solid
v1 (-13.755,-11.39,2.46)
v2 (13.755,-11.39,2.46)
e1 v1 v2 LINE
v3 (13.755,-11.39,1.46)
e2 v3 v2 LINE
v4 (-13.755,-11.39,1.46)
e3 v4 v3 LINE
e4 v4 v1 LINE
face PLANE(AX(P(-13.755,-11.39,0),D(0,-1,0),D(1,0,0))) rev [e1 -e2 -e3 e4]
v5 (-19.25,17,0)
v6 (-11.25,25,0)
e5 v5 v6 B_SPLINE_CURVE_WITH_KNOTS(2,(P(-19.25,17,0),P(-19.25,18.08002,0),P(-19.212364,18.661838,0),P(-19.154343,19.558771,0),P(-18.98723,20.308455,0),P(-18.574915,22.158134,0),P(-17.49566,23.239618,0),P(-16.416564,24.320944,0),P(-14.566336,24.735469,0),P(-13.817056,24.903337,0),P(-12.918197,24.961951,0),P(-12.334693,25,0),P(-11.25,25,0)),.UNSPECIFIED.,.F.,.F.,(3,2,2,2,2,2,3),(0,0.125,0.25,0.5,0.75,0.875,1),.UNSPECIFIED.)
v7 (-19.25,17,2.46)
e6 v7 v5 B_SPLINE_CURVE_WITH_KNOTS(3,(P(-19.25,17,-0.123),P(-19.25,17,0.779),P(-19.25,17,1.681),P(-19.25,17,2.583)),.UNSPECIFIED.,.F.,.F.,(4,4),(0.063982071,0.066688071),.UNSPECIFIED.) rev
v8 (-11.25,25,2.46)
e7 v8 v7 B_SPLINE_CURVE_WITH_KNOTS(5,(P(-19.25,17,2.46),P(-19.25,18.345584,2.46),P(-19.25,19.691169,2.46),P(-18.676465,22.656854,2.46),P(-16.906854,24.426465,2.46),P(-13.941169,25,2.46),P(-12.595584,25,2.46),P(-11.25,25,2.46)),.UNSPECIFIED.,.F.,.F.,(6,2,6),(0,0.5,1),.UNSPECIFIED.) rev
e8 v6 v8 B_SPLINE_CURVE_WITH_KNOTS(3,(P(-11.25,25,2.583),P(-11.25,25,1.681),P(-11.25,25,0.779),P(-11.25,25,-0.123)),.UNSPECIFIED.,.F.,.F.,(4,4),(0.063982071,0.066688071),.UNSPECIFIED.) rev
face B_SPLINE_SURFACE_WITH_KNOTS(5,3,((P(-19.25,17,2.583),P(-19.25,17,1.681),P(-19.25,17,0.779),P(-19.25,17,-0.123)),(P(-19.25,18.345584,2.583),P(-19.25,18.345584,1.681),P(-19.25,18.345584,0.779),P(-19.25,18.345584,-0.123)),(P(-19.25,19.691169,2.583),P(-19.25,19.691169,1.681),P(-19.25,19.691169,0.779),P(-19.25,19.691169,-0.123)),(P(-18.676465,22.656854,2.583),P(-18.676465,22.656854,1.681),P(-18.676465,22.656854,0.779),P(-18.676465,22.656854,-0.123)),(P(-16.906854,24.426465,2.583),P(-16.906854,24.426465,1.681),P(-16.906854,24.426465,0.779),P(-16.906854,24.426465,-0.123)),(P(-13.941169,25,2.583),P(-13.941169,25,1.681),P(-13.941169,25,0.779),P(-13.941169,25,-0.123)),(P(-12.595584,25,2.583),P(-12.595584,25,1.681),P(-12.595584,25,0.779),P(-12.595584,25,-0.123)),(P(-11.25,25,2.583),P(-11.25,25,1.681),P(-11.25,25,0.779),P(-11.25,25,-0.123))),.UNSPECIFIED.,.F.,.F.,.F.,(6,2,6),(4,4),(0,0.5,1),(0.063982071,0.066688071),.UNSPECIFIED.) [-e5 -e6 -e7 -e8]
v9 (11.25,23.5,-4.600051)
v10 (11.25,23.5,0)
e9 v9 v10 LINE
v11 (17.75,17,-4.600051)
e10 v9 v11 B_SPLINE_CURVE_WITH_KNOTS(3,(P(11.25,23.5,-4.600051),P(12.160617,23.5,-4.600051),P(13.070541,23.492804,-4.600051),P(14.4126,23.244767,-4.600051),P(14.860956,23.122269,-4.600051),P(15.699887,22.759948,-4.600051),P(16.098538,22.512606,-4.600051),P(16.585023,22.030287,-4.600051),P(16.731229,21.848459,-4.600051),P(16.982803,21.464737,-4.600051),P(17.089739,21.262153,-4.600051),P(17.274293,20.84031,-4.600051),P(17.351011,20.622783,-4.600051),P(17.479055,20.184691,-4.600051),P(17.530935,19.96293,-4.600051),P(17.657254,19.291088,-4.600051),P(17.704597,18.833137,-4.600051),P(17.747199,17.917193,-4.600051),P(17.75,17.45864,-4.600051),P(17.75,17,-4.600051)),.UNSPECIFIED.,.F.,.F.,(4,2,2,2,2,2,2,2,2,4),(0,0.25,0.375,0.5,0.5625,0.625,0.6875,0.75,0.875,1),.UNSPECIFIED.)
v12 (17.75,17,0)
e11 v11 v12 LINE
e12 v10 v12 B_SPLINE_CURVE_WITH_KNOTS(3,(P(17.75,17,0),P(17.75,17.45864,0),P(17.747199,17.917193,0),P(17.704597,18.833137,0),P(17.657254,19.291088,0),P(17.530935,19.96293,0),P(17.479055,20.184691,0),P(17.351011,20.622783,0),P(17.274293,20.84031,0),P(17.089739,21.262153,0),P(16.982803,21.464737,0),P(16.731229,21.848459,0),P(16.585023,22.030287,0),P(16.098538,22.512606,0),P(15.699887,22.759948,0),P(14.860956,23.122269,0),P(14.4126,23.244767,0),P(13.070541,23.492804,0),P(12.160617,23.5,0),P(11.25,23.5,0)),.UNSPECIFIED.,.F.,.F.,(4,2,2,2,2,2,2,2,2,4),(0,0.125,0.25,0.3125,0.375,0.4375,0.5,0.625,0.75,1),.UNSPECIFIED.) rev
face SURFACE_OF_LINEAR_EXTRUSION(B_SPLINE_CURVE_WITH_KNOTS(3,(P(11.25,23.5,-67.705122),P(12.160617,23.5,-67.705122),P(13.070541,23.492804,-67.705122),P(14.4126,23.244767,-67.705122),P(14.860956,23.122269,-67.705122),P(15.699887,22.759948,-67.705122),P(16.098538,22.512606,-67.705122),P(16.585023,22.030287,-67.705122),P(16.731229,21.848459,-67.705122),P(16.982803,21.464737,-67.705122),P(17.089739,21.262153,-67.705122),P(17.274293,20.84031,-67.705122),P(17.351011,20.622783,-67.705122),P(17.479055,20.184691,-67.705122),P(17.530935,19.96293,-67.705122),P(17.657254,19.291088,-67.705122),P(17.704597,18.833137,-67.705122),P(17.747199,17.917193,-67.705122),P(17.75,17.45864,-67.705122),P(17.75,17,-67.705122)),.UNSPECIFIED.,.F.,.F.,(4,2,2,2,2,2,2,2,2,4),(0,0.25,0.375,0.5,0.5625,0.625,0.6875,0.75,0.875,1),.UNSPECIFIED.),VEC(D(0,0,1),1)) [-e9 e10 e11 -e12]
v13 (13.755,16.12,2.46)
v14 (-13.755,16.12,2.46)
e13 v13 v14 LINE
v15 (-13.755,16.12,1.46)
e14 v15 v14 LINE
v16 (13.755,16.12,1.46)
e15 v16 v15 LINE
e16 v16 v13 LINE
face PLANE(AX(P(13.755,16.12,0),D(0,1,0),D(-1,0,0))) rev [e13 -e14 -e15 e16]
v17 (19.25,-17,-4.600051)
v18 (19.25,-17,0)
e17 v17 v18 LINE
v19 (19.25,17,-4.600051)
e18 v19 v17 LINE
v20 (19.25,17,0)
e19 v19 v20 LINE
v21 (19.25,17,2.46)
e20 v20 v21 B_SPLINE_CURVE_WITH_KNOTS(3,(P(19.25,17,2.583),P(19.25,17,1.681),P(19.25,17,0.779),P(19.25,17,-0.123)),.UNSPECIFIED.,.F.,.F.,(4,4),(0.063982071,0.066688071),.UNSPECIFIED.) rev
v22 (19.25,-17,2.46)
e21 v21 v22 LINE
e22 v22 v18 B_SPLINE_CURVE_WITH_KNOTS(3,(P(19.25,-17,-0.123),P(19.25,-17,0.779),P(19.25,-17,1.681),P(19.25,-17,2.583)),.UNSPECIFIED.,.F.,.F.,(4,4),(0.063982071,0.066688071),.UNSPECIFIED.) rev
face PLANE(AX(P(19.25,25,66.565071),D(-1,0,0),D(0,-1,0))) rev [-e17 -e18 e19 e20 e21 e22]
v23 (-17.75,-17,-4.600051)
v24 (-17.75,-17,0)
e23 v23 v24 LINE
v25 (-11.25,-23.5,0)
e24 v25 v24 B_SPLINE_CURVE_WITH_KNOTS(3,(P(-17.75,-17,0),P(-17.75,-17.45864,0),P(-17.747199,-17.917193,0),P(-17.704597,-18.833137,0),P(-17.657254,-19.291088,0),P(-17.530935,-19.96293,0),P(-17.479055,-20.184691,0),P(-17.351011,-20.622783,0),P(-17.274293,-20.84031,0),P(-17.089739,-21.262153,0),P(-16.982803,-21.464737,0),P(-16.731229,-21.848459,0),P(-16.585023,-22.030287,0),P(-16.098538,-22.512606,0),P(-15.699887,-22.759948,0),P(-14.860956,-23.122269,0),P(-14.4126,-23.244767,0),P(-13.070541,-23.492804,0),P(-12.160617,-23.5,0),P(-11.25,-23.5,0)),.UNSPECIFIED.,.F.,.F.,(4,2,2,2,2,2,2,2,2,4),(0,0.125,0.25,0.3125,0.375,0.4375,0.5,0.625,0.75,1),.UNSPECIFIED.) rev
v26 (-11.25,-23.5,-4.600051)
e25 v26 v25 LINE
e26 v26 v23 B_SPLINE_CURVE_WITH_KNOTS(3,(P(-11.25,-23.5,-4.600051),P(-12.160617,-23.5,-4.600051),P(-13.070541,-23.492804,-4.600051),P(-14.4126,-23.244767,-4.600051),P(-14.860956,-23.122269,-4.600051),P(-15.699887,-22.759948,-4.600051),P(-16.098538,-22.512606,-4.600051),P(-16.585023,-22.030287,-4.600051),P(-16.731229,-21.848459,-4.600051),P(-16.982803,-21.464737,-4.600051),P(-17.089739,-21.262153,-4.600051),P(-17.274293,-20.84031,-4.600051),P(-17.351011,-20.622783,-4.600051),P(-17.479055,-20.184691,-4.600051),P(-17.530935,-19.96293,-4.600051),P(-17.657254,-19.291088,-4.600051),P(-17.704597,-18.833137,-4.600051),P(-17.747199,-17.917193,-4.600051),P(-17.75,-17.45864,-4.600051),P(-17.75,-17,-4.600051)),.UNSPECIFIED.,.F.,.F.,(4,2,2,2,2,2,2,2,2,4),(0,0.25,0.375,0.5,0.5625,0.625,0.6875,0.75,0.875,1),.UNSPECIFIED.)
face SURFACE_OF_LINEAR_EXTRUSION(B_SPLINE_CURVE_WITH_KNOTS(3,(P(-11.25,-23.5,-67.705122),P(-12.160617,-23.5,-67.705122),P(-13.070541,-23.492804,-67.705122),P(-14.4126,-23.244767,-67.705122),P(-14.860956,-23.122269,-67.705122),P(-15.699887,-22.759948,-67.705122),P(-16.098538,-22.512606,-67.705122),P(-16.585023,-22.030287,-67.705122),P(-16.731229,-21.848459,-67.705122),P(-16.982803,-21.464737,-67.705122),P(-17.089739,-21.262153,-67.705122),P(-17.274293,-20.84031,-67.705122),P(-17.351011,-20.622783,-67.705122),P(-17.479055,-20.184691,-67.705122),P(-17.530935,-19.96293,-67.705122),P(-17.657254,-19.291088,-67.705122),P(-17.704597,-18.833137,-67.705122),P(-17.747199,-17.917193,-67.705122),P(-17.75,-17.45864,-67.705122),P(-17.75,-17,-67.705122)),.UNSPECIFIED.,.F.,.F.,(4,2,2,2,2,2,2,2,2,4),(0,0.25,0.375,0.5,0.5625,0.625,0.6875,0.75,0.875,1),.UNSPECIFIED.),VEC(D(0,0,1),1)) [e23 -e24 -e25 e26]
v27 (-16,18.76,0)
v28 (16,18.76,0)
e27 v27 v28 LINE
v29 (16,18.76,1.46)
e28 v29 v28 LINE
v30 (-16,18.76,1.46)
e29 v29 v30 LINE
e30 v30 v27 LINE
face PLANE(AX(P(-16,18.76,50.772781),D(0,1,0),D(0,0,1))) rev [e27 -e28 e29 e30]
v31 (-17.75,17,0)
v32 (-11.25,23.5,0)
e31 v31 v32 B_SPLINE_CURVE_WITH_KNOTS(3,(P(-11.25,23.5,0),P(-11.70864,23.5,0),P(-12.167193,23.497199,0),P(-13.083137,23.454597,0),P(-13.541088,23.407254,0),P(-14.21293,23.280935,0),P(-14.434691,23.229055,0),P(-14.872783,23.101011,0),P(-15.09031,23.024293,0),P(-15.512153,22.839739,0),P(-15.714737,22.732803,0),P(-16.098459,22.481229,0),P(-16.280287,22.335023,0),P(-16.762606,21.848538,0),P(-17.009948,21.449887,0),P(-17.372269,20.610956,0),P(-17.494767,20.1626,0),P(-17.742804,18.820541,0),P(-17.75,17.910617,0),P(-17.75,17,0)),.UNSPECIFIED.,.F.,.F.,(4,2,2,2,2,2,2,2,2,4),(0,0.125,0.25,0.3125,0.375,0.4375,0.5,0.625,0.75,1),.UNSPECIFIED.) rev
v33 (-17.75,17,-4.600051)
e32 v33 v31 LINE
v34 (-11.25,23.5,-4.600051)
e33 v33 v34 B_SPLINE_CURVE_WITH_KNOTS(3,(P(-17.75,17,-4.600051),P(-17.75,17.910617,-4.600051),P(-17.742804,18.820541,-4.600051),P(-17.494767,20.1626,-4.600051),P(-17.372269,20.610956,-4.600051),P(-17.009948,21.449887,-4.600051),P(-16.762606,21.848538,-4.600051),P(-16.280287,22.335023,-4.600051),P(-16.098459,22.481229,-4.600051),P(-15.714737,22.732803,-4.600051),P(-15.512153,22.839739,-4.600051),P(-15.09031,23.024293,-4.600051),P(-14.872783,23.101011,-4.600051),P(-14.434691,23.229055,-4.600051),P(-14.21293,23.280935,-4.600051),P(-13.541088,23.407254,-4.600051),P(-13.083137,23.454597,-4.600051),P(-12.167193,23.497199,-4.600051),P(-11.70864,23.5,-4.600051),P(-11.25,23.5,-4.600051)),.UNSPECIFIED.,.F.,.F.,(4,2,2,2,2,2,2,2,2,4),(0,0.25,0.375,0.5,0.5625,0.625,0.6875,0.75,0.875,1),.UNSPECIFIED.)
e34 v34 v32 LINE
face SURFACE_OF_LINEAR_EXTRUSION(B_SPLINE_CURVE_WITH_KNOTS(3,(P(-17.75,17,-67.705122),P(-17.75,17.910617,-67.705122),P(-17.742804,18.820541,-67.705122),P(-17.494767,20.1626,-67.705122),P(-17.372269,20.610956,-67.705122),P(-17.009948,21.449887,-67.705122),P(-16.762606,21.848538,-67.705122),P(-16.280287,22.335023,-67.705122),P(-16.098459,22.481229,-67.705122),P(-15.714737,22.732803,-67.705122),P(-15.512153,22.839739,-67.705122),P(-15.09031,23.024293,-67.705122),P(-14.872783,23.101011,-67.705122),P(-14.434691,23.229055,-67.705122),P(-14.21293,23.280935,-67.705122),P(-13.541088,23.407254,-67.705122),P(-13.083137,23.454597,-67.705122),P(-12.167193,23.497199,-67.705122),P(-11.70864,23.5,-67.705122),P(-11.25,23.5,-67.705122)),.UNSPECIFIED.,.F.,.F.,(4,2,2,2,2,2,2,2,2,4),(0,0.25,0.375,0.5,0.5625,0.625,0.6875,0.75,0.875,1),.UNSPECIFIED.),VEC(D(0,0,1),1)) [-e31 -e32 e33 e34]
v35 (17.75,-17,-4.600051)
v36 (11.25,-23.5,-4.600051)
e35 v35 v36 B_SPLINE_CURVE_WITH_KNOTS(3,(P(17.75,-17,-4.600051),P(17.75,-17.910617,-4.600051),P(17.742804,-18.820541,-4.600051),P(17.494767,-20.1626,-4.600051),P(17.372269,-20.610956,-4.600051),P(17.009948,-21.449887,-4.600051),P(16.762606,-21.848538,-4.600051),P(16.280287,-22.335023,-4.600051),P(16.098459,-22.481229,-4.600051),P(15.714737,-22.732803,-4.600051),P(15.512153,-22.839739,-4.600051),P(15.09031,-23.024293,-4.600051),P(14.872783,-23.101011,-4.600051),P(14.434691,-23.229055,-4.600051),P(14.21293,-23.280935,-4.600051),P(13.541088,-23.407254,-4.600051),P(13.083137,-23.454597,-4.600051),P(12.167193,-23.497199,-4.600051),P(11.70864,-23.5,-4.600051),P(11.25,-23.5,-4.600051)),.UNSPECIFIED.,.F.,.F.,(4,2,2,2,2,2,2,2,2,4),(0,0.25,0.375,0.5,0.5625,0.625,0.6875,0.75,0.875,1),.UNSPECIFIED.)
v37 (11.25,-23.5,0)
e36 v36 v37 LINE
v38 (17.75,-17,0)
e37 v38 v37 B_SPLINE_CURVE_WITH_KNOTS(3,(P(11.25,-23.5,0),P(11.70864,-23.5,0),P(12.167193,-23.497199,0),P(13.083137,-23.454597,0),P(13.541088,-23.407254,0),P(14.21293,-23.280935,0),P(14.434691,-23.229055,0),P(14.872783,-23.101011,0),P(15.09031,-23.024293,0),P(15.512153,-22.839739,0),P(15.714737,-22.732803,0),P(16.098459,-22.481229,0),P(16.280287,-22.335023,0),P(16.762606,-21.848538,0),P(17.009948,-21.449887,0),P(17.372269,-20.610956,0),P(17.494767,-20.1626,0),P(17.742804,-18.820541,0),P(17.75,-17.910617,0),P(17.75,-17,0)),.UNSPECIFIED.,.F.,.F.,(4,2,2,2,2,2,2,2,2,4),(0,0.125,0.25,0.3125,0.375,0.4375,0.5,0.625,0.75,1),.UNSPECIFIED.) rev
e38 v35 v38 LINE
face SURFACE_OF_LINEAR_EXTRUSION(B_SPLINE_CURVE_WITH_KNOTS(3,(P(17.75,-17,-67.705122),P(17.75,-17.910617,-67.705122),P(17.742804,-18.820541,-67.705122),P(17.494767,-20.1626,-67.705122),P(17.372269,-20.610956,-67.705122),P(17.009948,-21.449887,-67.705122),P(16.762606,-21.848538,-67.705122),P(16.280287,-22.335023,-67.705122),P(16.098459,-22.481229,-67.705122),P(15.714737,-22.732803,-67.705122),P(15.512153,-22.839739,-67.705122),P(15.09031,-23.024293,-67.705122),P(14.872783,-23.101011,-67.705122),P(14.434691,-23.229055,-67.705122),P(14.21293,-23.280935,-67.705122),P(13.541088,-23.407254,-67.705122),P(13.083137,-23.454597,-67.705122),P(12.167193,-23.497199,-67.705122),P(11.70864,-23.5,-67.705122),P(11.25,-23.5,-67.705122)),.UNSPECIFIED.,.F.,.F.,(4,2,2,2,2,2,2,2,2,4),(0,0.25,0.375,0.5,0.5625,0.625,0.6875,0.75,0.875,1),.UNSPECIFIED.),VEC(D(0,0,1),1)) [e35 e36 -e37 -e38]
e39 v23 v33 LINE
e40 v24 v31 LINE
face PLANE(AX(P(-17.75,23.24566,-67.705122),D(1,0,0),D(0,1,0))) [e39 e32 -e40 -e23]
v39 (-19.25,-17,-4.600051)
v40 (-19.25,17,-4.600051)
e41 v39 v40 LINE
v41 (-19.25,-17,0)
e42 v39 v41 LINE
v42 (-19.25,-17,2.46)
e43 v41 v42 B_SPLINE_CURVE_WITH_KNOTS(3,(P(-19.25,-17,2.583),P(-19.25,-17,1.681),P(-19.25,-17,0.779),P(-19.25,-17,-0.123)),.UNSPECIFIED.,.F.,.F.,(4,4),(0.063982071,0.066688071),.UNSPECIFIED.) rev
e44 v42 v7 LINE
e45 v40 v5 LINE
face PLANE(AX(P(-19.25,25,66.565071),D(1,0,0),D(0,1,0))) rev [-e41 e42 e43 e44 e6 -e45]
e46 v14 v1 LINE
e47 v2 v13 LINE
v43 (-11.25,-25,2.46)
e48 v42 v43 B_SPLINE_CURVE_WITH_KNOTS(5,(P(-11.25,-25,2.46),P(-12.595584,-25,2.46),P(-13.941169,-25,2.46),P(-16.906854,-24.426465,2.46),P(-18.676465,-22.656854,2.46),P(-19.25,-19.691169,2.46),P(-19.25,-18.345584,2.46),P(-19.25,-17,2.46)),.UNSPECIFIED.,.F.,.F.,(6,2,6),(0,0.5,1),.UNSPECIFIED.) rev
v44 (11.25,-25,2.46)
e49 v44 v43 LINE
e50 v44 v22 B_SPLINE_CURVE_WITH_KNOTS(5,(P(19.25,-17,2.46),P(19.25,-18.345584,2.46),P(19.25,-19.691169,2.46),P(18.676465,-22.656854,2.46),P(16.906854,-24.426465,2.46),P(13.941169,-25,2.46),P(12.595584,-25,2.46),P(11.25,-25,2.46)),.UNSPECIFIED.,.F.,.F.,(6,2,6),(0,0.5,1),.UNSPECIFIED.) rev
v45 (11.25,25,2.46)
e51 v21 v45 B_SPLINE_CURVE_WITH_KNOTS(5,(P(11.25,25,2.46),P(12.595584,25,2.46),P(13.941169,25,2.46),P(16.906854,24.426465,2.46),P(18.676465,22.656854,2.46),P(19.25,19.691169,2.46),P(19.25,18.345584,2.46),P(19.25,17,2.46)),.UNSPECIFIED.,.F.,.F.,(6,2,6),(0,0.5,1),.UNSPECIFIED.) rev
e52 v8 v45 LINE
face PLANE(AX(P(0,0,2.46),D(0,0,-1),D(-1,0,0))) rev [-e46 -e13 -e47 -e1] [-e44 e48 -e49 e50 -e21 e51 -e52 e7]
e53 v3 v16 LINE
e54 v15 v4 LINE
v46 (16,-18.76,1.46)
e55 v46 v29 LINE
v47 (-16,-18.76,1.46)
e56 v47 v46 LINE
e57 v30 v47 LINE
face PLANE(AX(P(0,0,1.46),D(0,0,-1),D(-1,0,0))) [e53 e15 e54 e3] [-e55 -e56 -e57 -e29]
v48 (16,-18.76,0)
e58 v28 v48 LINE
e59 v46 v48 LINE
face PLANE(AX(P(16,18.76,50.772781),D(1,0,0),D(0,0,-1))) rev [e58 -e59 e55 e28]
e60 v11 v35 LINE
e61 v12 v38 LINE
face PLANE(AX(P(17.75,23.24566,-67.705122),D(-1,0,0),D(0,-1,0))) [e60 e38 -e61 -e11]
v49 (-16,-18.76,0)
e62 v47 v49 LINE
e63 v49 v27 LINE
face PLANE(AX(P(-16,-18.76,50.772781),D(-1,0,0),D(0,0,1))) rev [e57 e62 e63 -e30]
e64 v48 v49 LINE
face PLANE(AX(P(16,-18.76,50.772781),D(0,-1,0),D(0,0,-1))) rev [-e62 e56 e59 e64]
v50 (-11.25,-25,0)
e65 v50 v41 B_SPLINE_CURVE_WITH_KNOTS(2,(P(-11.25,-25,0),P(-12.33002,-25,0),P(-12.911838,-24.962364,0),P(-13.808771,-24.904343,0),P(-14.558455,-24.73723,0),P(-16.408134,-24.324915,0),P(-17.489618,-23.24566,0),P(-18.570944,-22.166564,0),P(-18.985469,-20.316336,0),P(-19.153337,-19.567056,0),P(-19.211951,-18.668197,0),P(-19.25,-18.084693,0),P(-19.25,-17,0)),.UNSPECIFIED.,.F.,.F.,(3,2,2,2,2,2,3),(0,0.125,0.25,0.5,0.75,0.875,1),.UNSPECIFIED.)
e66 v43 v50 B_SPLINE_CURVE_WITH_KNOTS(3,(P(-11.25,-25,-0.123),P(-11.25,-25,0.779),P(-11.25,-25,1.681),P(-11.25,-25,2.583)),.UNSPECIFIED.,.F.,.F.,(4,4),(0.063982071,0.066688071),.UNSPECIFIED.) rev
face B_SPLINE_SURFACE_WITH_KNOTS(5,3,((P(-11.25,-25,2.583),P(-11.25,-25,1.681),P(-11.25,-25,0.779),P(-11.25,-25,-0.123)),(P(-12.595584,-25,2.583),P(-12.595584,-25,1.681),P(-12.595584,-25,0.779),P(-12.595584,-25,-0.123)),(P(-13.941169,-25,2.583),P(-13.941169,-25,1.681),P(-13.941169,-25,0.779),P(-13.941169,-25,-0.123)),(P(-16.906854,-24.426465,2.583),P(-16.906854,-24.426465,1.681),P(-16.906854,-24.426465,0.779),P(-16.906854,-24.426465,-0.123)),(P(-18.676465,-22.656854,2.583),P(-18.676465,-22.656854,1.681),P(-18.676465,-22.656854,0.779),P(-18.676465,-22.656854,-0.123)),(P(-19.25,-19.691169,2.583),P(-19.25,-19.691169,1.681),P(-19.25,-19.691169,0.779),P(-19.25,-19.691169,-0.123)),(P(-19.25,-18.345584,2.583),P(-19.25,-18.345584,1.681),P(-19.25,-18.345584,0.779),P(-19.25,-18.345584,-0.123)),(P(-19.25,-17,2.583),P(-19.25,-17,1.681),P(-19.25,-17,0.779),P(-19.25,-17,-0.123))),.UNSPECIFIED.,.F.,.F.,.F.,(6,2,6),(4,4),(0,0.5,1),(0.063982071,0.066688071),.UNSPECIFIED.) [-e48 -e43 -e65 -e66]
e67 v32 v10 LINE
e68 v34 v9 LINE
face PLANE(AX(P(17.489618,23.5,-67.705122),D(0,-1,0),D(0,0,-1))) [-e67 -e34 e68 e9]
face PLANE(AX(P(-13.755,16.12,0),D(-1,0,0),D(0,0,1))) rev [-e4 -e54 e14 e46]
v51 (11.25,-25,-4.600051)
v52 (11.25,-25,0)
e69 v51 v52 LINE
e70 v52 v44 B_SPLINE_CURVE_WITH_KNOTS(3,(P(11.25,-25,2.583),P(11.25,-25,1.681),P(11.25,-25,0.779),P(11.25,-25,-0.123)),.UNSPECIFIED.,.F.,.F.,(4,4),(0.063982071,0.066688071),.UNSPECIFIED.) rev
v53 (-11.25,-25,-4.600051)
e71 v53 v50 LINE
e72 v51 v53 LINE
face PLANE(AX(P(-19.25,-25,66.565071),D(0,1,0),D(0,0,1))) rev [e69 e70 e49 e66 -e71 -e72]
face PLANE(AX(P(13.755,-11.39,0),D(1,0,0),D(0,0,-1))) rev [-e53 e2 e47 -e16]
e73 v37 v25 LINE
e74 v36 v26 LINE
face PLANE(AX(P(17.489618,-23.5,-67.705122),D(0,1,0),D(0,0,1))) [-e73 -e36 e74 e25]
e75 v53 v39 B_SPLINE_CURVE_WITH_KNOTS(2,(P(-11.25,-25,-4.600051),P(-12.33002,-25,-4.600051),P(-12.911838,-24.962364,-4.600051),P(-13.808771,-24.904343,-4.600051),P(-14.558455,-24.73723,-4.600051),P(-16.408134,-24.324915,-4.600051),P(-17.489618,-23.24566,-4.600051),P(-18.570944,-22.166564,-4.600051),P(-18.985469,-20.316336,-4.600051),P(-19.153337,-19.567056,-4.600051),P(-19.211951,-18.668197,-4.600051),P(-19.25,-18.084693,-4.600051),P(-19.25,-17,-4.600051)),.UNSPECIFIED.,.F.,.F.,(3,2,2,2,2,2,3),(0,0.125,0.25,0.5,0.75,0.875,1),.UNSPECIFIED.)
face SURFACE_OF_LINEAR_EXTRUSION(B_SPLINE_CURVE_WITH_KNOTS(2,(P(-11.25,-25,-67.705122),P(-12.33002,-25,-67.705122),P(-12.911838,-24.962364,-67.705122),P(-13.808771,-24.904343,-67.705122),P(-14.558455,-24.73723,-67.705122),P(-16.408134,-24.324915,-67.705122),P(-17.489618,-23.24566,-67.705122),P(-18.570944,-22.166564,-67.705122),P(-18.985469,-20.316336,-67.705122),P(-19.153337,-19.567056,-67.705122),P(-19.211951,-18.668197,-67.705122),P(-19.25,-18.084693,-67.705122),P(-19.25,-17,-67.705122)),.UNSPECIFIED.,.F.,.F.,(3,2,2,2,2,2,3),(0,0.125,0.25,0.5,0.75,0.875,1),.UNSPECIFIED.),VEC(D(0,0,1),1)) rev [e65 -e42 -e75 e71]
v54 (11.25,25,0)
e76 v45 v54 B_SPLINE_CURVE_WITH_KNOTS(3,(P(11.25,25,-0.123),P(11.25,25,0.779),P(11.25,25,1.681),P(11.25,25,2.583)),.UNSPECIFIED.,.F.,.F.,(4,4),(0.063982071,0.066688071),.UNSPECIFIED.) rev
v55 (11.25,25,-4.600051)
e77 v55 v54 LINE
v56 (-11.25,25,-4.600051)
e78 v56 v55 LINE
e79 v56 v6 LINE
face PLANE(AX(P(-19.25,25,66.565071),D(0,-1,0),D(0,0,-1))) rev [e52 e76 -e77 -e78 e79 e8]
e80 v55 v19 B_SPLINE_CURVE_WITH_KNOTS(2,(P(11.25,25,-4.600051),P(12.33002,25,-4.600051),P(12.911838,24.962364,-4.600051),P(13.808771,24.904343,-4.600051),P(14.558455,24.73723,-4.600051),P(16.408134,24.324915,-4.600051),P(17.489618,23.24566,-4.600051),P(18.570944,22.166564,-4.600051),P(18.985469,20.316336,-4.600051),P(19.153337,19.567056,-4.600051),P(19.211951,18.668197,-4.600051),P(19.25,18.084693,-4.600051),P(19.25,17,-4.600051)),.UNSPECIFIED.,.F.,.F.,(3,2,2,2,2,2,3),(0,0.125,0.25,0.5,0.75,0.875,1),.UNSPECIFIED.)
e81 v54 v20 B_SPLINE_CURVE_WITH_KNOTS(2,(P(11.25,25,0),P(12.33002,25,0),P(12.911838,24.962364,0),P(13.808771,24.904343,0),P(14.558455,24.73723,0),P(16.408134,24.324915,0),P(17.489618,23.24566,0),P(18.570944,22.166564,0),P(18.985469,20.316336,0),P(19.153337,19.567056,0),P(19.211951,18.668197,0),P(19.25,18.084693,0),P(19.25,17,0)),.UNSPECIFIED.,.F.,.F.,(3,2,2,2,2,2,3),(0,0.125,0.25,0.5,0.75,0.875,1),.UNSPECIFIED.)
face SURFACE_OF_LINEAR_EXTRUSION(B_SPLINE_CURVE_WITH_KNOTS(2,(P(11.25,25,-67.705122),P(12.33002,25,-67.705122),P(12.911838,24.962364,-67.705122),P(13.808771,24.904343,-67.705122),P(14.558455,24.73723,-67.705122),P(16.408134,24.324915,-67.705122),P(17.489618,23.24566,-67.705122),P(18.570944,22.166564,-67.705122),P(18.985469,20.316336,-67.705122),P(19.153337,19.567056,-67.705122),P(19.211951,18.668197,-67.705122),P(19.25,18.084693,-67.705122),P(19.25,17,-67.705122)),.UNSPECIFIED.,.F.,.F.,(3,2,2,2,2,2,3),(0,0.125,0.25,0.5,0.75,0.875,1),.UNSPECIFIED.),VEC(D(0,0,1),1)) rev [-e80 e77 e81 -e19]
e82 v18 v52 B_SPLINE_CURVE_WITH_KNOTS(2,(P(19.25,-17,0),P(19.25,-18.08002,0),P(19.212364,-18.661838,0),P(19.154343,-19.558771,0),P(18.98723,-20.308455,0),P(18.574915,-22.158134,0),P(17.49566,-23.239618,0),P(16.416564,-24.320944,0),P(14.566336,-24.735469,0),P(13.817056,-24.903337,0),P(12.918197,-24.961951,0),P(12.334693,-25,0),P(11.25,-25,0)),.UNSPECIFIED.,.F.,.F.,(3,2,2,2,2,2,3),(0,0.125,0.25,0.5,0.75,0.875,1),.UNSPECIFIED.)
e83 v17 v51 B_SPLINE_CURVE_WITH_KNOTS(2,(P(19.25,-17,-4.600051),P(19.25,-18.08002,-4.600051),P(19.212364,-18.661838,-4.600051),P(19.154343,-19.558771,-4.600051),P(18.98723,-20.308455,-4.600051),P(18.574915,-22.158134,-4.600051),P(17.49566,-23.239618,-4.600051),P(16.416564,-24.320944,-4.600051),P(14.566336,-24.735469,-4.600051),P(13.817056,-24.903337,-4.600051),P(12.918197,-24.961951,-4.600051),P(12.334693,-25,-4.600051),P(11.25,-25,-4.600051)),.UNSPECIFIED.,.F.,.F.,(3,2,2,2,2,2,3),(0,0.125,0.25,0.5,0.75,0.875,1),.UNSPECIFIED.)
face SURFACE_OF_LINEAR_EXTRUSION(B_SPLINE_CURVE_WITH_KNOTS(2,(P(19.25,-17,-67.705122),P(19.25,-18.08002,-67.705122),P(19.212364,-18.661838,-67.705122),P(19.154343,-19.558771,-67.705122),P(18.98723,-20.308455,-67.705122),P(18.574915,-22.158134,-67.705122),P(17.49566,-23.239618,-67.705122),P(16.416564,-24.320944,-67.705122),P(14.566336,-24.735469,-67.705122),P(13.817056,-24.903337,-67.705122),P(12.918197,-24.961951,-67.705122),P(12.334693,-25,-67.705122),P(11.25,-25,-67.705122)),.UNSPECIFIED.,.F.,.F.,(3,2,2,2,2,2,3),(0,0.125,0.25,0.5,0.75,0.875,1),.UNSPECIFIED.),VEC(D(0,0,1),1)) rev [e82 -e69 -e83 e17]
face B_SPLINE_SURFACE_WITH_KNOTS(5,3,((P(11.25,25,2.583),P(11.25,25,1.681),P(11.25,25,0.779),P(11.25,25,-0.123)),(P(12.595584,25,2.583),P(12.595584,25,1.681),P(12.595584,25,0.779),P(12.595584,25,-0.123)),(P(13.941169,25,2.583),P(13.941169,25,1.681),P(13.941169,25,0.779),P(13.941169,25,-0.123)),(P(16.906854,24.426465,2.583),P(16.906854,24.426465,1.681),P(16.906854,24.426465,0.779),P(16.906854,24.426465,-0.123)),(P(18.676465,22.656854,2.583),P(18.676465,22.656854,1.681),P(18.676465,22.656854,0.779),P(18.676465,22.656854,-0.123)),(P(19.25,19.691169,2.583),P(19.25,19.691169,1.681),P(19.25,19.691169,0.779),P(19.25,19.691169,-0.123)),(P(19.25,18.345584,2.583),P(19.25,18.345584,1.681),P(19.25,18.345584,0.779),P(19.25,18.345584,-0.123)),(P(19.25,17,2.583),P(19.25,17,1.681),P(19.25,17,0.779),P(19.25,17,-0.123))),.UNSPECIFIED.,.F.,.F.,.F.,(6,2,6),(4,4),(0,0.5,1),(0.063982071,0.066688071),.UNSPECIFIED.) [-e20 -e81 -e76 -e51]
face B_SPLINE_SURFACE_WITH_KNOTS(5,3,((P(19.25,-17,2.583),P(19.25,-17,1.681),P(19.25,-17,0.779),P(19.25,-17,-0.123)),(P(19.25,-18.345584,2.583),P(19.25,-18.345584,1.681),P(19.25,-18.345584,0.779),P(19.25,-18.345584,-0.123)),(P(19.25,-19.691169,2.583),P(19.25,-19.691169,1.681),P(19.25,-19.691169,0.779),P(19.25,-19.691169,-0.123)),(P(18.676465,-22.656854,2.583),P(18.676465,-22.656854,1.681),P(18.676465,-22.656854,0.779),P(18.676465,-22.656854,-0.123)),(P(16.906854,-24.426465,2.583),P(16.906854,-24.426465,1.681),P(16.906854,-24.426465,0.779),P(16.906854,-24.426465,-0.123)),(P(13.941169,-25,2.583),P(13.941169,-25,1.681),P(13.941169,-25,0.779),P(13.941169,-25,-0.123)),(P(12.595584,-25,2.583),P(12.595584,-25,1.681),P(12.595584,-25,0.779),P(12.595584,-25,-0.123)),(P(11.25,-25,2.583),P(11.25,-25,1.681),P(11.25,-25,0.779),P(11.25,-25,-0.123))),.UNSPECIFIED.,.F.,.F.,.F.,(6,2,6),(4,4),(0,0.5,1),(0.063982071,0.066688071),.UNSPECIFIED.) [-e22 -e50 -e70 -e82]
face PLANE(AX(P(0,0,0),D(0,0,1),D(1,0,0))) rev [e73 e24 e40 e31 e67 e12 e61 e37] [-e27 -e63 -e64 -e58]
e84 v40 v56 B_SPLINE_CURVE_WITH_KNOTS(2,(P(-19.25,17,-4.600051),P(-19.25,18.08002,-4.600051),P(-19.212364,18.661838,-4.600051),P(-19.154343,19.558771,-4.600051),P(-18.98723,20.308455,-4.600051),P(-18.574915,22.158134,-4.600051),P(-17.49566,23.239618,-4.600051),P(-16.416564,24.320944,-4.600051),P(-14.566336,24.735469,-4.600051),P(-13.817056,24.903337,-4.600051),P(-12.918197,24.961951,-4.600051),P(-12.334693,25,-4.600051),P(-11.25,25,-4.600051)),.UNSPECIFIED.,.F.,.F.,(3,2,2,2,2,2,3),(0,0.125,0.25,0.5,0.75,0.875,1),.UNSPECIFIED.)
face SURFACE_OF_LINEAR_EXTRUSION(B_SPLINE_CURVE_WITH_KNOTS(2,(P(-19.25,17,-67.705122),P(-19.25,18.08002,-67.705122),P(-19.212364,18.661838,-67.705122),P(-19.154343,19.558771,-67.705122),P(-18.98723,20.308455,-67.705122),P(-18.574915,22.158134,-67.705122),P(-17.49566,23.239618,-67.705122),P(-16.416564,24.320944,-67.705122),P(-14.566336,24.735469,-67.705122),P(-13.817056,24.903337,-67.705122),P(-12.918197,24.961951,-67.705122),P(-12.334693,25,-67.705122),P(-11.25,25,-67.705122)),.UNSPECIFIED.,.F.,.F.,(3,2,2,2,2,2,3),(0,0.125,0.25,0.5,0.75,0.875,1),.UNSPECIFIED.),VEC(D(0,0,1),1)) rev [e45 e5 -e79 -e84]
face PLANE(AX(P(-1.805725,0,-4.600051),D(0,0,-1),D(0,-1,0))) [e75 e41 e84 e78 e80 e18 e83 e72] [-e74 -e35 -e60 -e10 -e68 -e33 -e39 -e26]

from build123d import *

# Parameters (mm, degrees)
SKETCH2_W           = 38.5
SKETCH2_H           = 50
BOSS_EXTRUDE1_DEPTH = 2.46
SKETCH3_W           = 27.51
SKETCH3_H           = 27.51
CUT_EXTRUDE1_DEPTH  = 32.648287473
CUT_EXTRUDE2_START  = -1.46
SKETCH4_W           = 32
SKETCH4_H           = 37.52
CUT_EXTRUDE2_DEPTH  = 1.46
FILLET1_SIZE        = 8
EXTRUDE_THIN1_DEPTH = 4.6000508


with BuildPart() as part:
    # Sketch2 → Boss-Extrude1 (new body)
    with BuildSketch(Plane.XY):
        Rectangle(SKETCH2_W, SKETCH2_H)
    extrude(amount=BOSS_EXTRUDE1_DEPTH)

    # Sketch3 → Cut-Extrude1 (cut, through all)
    with BuildSketch(Plane.XY.offset(2.46)):
        with Locations((0, 2.365)):
            Rectangle(SKETCH3_W, SKETCH3_H)
    extrude(amount=-CUT_EXTRUDE1_DEPTH, mode=Mode.SUBTRACT)

    # Sketch4 → Cut-Extrude2 (cut)
    with BuildSketch(Plane(origin=(0, 0, 0), x_dir=(-1, 0, 0), z_dir=(0, 0, -1)).offset(CUT_EXTRUDE2_START)):
        Rectangle(SKETCH4_W, SKETCH4_H)
    extrude(amount=CUT_EXTRUDE2_DEPTH, mode=Mode.SUBTRACT)

    # Fillet1
    # a fillet whose section is not a circle: 8 mm, written as the material it takes off along each edge
    with BuildSketch(Plane(origin=(19.25, -25, -20), x_dir=(0, 1, 0), z_dir=(0, 0, 1)), Plane(origin=(19.25, 25, -20), x_dir=(-1, 0, 0), z_dir=(0, 0, 1))) as fillet1_piece_1:
        with BuildLine():
            add(Edge.make_bspline([(FILLET1_SIZE, 0), (FILLET1_SIZE * 0.831801948466, 0), (FILLET1_SIZE * 0.663603896932, 0), (FILLET1_SIZE * 0.292893218813, FILLET1_SIZE * 0.0716919198361), (FILLET1_SIZE * 0.0716919198361, FILLET1_SIZE * 0.292893218813), (0, FILLET1_SIZE * 0.663603896932), (0, FILLET1_SIZE * 0.831801948466), (0, FILLET1_SIZE)], knots=[0, 0, 0, 0, 0, 0, 0.5, 0.5, 1, 1, 1, 1, 1, 1], degree=5))
            Line((0, FILLET1_SIZE), (0, 0))
            Line((0, 0), (FILLET1_SIZE, 0))
        make_face()
    extrude(amount=42.46, mode=Mode.SUBTRACT)
    with BuildSketch(Plane(origin=(-19.25, -25, -20), x_dir=(0, 1, 0), z_dir=(0, 0, 1)), Plane(origin=(-19.25, 25, -20), x_dir=(1, 0, 0), z_dir=(0, 0, 1))) as fillet1_piece_2:
        with BuildLine():
            add(Edge.make_bspline([(FILLET1_SIZE, 0), (FILLET1_SIZE * 0.831801948466, 0), (FILLET1_SIZE * 0.663603896932, 0), (FILLET1_SIZE * 0.292893218813, -FILLET1_SIZE * 0.0716919198361), (FILLET1_SIZE * 0.0716919198361, -FILLET1_SIZE * 0.292893218813), (0, -FILLET1_SIZE * 0.663603896932), (0, -FILLET1_SIZE * 0.831801948466), (0, -FILLET1_SIZE)], knots=[0, 0, 0, 0, 0, 0, 0.5, 0.5, 1, 1, 1, 1, 1, 1], degree=5))
            Line((0, -FILLET1_SIZE), (0, 0))
            Line((0, 0), (FILLET1_SIZE, 0))
        make_face()
    extrude(amount=42.46, mode=Mode.SUBTRACT)

    # Extrude-Thin1: read off the stored shape, not the designer's step
    # Extrude-Thin1 outline → Extrude-Thin1 (add)
    with BuildSketch(Plane(origin=(0, 0, 0), x_dir=(-1, 0, 0), z_dir=(0, 0, -1))):
        with BuildLine():
            Line((19.25, -17), (19.25, 17))
            add(Edge.make_bspline(
                [(19.25, 17), (19.25, 18.080020252), (19.21236359, 18.661838265), (19.154343151, 19.558771223), (18.987229849, 20.308455098), (18.574914705, 22.15813439), (17.495660449, 23.239618136), (16.416563674, 24.320944075), (14.566335811, 24.735468819), (13.817055919, 24.903337362), (12.9181968, 24.961950617), (12.334693381, 25), (11.25, 25)],
                knots=[0, 0, 0, 0.125, 0.125, 0.25, 0.25, 0.5, 0.5, 0.75, 0.75, 0.875, 0.875, 1, 1, 1], degree=2))
            Line((11.25, 25), (-11.25, 25))
            add(Edge.make_bspline(
                [(-11.25, 25), (-12.330020252, 25), (-12.911838265, 24.96236359), (-13.808771223, 24.904343151), (-14.558455098, 24.737229849), (-16.40813439, 24.324914706), (-17.489618136, 23.245660449), (-18.570944075, 22.166563674), (-18.985468819, 20.316335811), (-19.153337362, 19.567055919), (-19.211950617, 18.6681968), (-19.25, 18.084693381), (-19.25, 17)],
                knots=[0, 0, 0, 0.125, 0.125, 0.25, 0.25, 0.5, 0.5, 0.75, 0.75, 0.875, 0.875, 1, 1, 1], degree=2))
            Line((-19.25, 17), (-19.25, -17))
            add(Edge.make_bspline(
                [(-19.25, -17), (-19.25, -18.080020252), (-19.21236359, -18.661838265), (-19.154343151, -19.558771223), (-18.987229849, -20.308455098), (-18.574914705, -22.15813439), (-17.495660449, -23.239618136), (-16.416563674, -24.320944075), (-14.566335811, -24.735468819), (-13.817055919, -24.903337362), (-12.9181968, -24.961950617), (-12.334693381, -25), (-11.25, -25)],
                knots=[0, 0, 0, 0.125, 0.125, 0.25, 0.25, 0.5, 0.5, 0.75, 0.75, 0.875, 0.875, 1, 1, 1], degree=2))
            Line((-11.25, -25), (11.25, -25))
            add(Edge.make_bspline(
                [(11.25, -25), (12.330020252, -25), (12.911838265, -24.96236359), (13.808771223, -24.904343151), (14.558455098, -24.737229849), (16.40813439, -24.324914705), (17.489618136, -23.245660449), (18.570944075, -22.166563674), (18.985468819, -20.316335811), (19.153337362, -19.567055919), (19.211950617, -18.6681968), (19.25, -18.084693381), (19.25, -17)],
                knots=[0, 0, 0, 0.125, 0.125, 0.25, 0.25, 0.5, 0.5, 0.75, 0.75, 0.875, 0.875, 1, 1, 1], degree=2))
        make_face()
        with BuildLine():
            add(Edge.make_bspline(
                [(17.75, 17), (17.75, 17.910616857), (17.742803739, 18.820541265), (17.494766535, 20.162599542), (17.372269419, 20.610955669), (17.009948198, 21.449886938), (16.76260553, 21.8485376), (16.280287208, 22.3350229), (16.098458911, 22.481228553), (15.714737075, 22.732803098), (15.512153227, 22.839738566), (15.090310487, 23.024293387), (14.872783413, 23.101011181), (14.434691087, 23.229055253), (14.212929514, 23.280935234), (13.541087581, 23.407254361), (13.083137103, 23.45459729), (12.167192596, 23.497198895), (11.708640217, 23.5), (11.25, 23.5)],
                knots=[0, 0, 0, 0, 0.25, 0.25, 0.375, 0.375, 0.5, 0.5, 0.5625, 0.5625, 0.625, 0.625, 0.6875, 0.6875, 0.75, 0.75, 0.875, 0.875, 1, 1, 1, 1], degree=3))
            Line((17.75, 17), (17.75, -17))
            add(Edge.make_bspline(
                [(11.25, -23.5), (12.160616857, -23.5), (13.070541265, -23.492803739), (14.412599542, -23.244766535), (14.860955669, -23.122269419), (15.699886938, -22.759948198), (16.0985376, -22.51260553), (16.5850229, -22.030287208), (16.731228553, -21.848458911), (16.982803098, -21.464737075), (17.089738566, -21.262153227), (17.274293387, -20.840310487), (17.351011181, -20.622783413), (17.479055253, -20.184691087), (17.530935234, -19.962929514), (17.657254361, -19.291087581), (17.70459729, -18.833137103), (17.747198895, -17.917192596), (17.75, -17.458640217), (17.75, -17)],
                knots=[0, 0, 0, 0, 0.25, 0.25, 0.375, 0.375, 0.5, 0.5, 0.5625, 0.5625, 0.625, 0.625, 0.6875, 0.6875, 0.75, 0.75, 0.875, 0.875, 1, 1, 1, 1], degree=3))
            Line((11.25, -23.5), (-11.25, -23.5))
            add(Edge.make_bspline(
                [(-17.75, -17), (-17.75, -17.910616857), (-17.742803739, -18.820541265), (-17.494766535, -20.162599542), (-17.372269419, -20.610955669), (-17.009948198, -21.449886938), (-16.76260553, -21.8485376), (-16.280287208, -22.3350229), (-16.098458911, -22.481228553), (-15.714737075, -22.732803098), (-15.512153227, -22.839738566), (-15.090310487, -23.024293387), (-14.872783413, -23.101011181), (-14.434691087, -23.229055253), (-14.212929514, -23.280935234), (-13.541087581, -23.407254361), (-13.083137103, -23.45459729), (-12.167192596, -23.497198895), (-11.708640217, -23.5), (-11.25, -23.5)],
                knots=[0, 0, 0, 0, 0.25, 0.25, 0.375, 0.375, 0.5, 0.5, 0.5625, 0.5625, 0.625, 0.625, 0.6875, 0.6875, 0.75, 0.75, 0.875, 0.875, 1, 1, 1, 1], degree=3))
            Line((-17.75, -17), (-17.75, 17))
            add(Edge.make_bspline(
                [(-11.25, 23.5), (-12.160616857, 23.5), (-13.070541265, 23.492803739), (-14.412599542, 23.244766535), (-14.860955669, 23.122269419), (-15.699886938, 22.759948198), (-16.0985376, 22.51260553), (-16.5850229, 22.030287208), (-16.731228553, 21.848458911), (-16.982803098, 21.464737075), (-17.089738566, 21.262153227), (-17.274293387, 20.840310487), (-17.351011181, 20.622783413), (-17.479055253, 20.184691087), (-17.530935234, 19.962929514), (-17.657254361, 19.291087581), (-17.70459729, 18.833137103), (-17.747198895, 17.917192596), (-17.75, 17.458640217), (-17.75, 17)],
                knots=[0, 0, 0, 0, 0.25, 0.25, 0.375, 0.375, 0.5, 0.5, 0.5625, 0.5625, 0.625, 0.625, 0.6875, 0.6875, 0.75, 0.75, 0.875, 0.875, 1, 1, 1, 1], degree=3))
            Line((-11.25, 23.5), (11.25, 23.5))
        make_face(mode=Mode.SUBTRACT)
    extrude(amount=EXTRUDE_THIN1_DEPTH)


solid = part.part
